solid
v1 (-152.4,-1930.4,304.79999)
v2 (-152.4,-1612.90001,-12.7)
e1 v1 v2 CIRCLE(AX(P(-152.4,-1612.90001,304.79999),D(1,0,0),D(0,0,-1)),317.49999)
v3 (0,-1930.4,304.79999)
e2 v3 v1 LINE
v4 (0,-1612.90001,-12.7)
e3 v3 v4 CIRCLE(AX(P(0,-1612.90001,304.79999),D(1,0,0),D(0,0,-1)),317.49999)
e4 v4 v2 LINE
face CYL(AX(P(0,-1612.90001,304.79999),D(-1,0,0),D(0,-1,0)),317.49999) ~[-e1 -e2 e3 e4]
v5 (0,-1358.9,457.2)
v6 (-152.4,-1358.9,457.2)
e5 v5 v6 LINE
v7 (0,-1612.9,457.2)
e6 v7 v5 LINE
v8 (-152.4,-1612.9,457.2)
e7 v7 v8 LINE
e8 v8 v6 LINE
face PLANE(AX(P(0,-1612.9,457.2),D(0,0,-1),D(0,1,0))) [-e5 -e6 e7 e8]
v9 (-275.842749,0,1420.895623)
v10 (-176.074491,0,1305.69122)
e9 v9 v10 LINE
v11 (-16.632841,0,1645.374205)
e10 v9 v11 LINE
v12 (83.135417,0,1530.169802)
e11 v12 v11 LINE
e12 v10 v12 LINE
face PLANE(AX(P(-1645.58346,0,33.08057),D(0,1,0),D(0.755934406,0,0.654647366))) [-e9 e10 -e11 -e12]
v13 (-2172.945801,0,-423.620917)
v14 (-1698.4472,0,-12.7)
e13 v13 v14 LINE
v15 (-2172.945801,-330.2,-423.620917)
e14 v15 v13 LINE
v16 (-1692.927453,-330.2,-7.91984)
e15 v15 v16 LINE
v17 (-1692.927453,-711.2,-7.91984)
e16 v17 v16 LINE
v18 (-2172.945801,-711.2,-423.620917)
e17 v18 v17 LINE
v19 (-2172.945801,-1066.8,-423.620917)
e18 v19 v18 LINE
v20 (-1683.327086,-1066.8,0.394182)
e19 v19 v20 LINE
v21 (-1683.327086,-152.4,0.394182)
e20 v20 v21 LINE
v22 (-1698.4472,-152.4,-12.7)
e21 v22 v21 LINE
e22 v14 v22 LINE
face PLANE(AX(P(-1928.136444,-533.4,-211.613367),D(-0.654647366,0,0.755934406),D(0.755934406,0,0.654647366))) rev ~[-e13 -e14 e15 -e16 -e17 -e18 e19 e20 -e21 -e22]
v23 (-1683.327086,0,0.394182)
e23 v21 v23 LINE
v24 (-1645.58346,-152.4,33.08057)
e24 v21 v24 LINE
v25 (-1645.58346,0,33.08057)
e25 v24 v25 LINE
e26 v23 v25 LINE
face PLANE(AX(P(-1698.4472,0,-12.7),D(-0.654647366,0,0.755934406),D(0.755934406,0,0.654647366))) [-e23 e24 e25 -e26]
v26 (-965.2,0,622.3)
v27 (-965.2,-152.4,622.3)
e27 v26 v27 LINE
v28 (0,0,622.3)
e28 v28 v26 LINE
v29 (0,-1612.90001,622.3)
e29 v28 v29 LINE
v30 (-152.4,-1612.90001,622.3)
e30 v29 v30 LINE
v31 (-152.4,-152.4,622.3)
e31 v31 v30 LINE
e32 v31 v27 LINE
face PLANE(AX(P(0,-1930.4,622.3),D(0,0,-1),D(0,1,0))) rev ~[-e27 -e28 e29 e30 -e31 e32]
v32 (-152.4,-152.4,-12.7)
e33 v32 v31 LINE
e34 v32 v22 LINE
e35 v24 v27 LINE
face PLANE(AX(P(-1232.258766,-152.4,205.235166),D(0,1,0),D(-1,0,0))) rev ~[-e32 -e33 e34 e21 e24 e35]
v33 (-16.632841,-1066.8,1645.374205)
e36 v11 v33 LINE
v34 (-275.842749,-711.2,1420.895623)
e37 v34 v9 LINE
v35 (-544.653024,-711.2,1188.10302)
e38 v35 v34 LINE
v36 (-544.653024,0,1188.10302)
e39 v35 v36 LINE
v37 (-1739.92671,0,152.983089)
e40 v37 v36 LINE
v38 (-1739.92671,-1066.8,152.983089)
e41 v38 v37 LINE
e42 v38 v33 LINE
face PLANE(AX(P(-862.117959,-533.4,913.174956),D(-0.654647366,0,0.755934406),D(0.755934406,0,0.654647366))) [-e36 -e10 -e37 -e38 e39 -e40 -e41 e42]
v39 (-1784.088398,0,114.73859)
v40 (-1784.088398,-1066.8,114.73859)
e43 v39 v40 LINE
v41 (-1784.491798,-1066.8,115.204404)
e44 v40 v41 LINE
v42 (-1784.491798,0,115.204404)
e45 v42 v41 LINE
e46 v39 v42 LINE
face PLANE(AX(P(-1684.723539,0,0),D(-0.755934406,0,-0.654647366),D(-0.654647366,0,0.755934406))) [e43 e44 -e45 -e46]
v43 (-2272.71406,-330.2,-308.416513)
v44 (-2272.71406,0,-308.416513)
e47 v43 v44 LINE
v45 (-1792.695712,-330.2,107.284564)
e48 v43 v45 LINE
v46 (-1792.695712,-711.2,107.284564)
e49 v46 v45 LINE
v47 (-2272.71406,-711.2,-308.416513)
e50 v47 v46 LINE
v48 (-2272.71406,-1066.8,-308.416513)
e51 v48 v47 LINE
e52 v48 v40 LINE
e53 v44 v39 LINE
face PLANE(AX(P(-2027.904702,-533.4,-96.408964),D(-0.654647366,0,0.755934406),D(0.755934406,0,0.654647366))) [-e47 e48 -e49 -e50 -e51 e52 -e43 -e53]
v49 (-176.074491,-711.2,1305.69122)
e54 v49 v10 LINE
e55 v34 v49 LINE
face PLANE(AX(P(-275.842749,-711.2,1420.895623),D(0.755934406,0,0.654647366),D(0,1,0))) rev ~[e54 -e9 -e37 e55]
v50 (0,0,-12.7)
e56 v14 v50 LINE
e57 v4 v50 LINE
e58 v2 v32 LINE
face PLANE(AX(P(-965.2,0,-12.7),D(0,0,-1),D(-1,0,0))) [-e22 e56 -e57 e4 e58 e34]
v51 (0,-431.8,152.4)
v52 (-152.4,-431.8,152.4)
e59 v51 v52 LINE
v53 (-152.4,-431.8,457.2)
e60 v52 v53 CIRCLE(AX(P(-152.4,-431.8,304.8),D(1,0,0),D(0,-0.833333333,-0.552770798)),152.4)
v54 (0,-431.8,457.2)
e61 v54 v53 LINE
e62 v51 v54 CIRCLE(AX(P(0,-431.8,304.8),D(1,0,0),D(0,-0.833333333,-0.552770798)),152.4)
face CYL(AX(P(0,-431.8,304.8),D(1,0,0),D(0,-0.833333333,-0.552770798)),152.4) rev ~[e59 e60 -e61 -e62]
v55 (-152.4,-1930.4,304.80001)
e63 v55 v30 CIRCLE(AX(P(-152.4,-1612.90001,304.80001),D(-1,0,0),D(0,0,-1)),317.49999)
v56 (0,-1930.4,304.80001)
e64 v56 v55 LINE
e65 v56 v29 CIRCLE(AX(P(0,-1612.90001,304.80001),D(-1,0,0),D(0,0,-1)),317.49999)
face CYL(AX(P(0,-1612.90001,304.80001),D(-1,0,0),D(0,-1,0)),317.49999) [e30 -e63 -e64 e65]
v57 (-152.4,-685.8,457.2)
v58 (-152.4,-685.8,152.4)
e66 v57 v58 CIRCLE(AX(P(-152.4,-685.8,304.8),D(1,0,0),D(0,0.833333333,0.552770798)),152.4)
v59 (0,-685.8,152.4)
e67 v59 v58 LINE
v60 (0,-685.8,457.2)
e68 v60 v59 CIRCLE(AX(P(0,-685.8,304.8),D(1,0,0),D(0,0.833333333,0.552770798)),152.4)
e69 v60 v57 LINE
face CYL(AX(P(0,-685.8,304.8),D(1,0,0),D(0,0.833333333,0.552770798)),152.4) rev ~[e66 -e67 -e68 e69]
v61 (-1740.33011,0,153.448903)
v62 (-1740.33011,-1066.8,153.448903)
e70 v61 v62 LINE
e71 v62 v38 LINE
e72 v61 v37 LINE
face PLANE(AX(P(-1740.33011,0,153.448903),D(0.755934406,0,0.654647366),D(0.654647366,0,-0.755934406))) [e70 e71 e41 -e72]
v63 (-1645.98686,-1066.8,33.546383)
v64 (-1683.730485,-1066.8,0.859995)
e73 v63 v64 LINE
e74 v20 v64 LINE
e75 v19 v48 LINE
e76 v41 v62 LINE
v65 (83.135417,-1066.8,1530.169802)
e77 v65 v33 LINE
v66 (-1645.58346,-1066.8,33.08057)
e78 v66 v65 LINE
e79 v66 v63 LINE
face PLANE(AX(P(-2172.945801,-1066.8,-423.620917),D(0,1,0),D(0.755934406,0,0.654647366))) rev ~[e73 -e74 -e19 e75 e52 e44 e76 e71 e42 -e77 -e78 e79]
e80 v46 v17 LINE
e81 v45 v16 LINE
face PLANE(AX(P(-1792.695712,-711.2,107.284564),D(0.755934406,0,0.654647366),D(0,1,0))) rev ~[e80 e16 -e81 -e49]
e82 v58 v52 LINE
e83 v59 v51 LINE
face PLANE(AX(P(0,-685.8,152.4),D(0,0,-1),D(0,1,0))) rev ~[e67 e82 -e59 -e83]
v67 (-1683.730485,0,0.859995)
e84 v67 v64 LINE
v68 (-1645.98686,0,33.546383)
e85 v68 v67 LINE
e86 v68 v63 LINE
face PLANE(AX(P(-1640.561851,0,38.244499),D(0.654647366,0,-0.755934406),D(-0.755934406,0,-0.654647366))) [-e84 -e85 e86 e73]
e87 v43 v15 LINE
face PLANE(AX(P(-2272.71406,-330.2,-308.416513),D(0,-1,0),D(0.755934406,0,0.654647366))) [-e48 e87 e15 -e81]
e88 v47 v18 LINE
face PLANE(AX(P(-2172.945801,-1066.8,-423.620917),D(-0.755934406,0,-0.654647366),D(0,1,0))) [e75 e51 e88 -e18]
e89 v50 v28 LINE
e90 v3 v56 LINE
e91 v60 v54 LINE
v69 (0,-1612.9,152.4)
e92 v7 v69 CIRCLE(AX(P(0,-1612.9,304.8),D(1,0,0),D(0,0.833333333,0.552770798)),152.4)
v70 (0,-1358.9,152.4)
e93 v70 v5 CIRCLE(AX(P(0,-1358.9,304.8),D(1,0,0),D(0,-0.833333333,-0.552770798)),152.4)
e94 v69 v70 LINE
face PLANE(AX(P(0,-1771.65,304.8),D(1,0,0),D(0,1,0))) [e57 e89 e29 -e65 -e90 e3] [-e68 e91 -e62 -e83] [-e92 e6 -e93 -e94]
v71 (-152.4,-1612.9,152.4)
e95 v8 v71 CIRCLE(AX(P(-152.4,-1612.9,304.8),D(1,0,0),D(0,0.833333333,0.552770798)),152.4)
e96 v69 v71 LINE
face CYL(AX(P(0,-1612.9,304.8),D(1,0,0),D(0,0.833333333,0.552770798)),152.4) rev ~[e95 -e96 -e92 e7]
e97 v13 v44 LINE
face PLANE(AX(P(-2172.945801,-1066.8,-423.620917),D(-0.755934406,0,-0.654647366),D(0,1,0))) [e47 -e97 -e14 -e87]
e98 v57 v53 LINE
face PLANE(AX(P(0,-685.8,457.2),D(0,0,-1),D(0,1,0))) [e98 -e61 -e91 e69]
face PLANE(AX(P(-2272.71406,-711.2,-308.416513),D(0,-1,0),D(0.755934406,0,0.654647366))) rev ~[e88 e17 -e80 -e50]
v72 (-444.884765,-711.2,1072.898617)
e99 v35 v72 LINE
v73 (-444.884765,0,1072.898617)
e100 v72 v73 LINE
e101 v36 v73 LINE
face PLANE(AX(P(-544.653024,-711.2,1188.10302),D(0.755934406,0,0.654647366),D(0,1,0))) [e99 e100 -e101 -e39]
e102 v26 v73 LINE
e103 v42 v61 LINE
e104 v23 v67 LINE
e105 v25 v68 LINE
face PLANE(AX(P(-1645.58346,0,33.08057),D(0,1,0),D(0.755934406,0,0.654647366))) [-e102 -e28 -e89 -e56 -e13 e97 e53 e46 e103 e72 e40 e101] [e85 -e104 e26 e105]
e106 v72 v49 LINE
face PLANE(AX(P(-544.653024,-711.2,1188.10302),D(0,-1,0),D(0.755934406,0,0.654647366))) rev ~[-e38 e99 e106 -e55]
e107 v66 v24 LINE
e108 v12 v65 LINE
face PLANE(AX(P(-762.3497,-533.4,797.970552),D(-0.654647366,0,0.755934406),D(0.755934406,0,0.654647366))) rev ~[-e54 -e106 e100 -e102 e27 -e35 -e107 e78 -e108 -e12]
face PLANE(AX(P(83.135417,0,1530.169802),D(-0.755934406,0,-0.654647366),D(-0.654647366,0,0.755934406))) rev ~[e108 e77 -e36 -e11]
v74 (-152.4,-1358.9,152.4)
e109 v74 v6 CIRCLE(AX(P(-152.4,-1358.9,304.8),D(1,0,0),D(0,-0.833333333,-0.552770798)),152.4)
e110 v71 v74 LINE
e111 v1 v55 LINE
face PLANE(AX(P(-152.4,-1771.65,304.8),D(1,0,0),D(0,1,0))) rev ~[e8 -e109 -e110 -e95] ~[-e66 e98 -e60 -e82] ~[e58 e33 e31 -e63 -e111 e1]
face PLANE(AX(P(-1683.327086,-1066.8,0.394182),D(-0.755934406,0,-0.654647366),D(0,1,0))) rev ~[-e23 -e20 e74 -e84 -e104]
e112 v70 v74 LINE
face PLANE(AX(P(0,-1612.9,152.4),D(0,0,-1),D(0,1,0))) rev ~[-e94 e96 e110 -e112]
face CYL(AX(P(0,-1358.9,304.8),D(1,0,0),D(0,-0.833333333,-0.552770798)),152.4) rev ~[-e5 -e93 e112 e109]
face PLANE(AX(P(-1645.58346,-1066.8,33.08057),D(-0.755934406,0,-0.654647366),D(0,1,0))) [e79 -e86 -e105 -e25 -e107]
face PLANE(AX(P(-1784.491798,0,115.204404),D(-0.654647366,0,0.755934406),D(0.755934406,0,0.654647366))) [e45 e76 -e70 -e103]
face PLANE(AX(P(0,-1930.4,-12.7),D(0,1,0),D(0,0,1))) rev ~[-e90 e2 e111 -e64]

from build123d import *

# Parameters (mm, degrees)
F0_W      = 1612.9
F0_H      = 12.7
F0_H_2    = 609.6
F1_DEPTH  = 152.4
F2_W      = 254
F2_H      = 304.8
F3_DEPTH  = 152.4
F4_W      = 317.5
F4_H      = 635
F5_DEPTH  = 152.4
F6_R      = 317.49999
F8_DEPTH  = 152.4
F9_W      = 965.2
F9_H      = 635
F10_DEPTH = 152.4
F12_DEPTH = 152.4
F14_W     = 647.7
F14_H     = 1066.8
F15_DEPTH = 152.4
F16_W     = 2336.8
F16_H     = 1066.8
F17_DEPTH = 152.4
F19_DEPTH = 1066.8
F22_DEPTH = 1066.8
F23_W     = 635
F23_H     = 381
F24_DEPTH = 152.4
F25_W     = 355.6
F25_H     = 711.2
F26_DEPTH = 152.4


# Not quite as in the source:
# - a fillet or chamfer is up to 0.001 mm smaller than in the source, because OpenCascade refuses the exact size
# - a feature names something its author has since deleted; it is built from what else it names


with BuildPart() as f1:
    # F0 (on Right) → F1 (new body)
    with BuildSketch(Plane.YZ):
        with Locations((-806.45, -6.35)):
            Rectangle(F0_W, F0_H)
        with Locations((-806.45, 304.8)):
            Rectangle(F0_W, F0_H_2)
        with Locations((-806.45, 615.95)):
            Rectangle(F0_W, F0_H)
    extrude(amount=-F1_DEPTH)

    # F2 (on face) → F3 (cut)
    with BuildSketch(Plane.YZ):
        with Locations((-558.8, 304.8)):
            Rectangle(F2_W, F2_H)
        with Locations((-1485.9, 304.8)):
            Rectangle(F2_W, F2_H)
    extrude(amount=-F3_DEPTH, mode=Mode.SUBTRACT)

    # F4 (on face) → F5 (join)
    with BuildSketch(Plane.YZ):
        with Locations((-1771.65, 304.8)):
            Rectangle(F4_W, F4_H)
    extrude(amount=-F5_DEPTH)

    # F6 (radius 317.5 in the source; OpenCascade refuses exactly that, so slightly less here)
    f6_edges = [f1.edges().sort_by_distance(p)[0] for p in [
        (-76.2, -1930.4, 622.3),
        (-76.2, -1930.4, -12.7),
    ]]
    fillet(f6_edges, radius=F6_R)

    # F7 (on face) → F8 (cut)
    with BuildSketch(Plane.YZ):
        with BuildLine():
            ThreePointArc((-1485.9, 220.557730325), (-1466.9881087779, 260.8059094878), (-1460.5, 304.8))
            ThreePointArc((-1460.5, 304.8), (-1466.9881087779, 348.7940905122), (-1485.9, 389.042269675))
            ThreePointArc((-1485.9, 389.042269675), (-1511.3, 304.8), (-1485.9, 220.557730325))
        make_face()
        with BuildLine():
            ThreePointArc((-1485.9, 389.042269675), (-1466.9881087779, 348.7940905122), (-1460.5, 304.8))
            ThreePointArc((-1460.5, 304.8), (-1466.9881087779, 260.8059094878), (-1485.9, 220.557730325))
            ThreePointArc((-1485.9, 220.557730325), (-1314.9059094878, 158.8881087779), (-1206.5, 304.8))
            ThreePointArc((-1206.5, 304.8), (-1314.9059094878, 450.7118912221), (-1485.9, 389.042269675))
        make_face()
        with BuildLine():
            ThreePointArc((-1485.9, 220.557730325), (-1511.3, 304.8), (-1485.9, 389.042269675))
            ThreePointArc((-1485.9, 389.042269675), (-1765.3, 304.8), (-1485.9, 220.557730325))
        make_face()
        with BuildLine():
            ThreePointArc((-558.8, 220.557730325), (-539.8881087779, 260.8059094878), (-533.4, 304.8))
            ThreePointArc((-533.4, 304.8), (-539.8881087779, 348.7940905122), (-558.8, 389.042269675))
            ThreePointArc((-558.8, 389.042269675), (-584.2, 304.8), (-558.8, 220.557730325))
        make_face()
        with BuildLine():
            ThreePointArc((-558.8, 389.042269675), (-539.8881087779, 348.7940905122), (-533.4, 304.8))
            ThreePointArc((-533.4, 304.8), (-539.8881087779, 260.8059094878), (-558.8, 220.557730325))
            ThreePointArc((-558.8, 220.557730325), (-387.8059094878, 158.8881087779), (-279.4, 304.8))
            ThreePointArc((-279.4, 304.8), (-387.8059094878, 450.7118912221), (-558.8, 389.042269675))
        make_face()
        with BuildLine():
            ThreePointArc((-558.8, 220.557730325), (-584.2, 304.8), (-558.8, 389.042269675))
            ThreePointArc((-558.8, 389.042269675), (-838.2, 304.8), (-558.8, 220.557730325))
        make_face()
    extrude(amount=-F8_DEPTH, mode=Mode.SUBTRACT)

    # F9 (on face) → F10 (join)
    with BuildSketch(Plane(origin=(0, 0, 0), x_dir=(-1, 0, 0), z_dir=(0, 1, 0))):
        with Locations((482.6, 304.8)):
            Rectangle(F9_W, F9_H)
    extrude(amount=-F10_DEPTH)

    # F11 (on face) → F12 (join)
    with BuildSketch(Plane(origin=(0, 0, 0), x_dir=(-1, 0, 0), z_dir=(0, 1, 0))):
        Polygon((1698.4472, -12.7), (965.2, 622.3), (965.2, -12.7), align=None)
    extrude(amount=-F12_DEPTH)

    # F14 (on offset) → F15 (join)
    with BuildSketch(Plane(origin=(-721.6070671381, 0, 833.2541125657), x_dir=(0.7559344062, 0, 0.6546473658), z_dir=(-0.6546473658, 0, 0.7559344062))):
        with Locations((-1596.0768110359, -533.4)):
            Rectangle(F14_W, F14_H)
    extrude(amount=F15_DEPTH)

    # F16 (on offset) → F17 (join)
    with BuildSketch(Plane(origin=(-721.6070671381, 0, 833.2541125657), x_dir=(0.7559344062, 0, 0.6546473658), z_dir=(-0.6546473658, 0, 0.7559344062))):
        with Locations((-53.897047908, -533.4)):
            Rectangle(F16_W, F16_H)
    extrude(amount=F17_DEPTH)

    # F18 (on face) → F19 (cut)
    with BuildSketch(Plane(origin=(0, 0, 0), x_dir=(-1, 0, 0), z_dir=(0, 1, 0))):
        Polygon((16.6328412597, 1645.374205089), (-21.1158016224, 1678.0649378052), (-120.8840601663, 1562.8605342995), (-83.1354172842, 1530.1698015833), align=None)
    extrude(amount=-F19_DEPTH, mode=Mode.SUBTRACT)

    # F21 (on offset) → F22 (join)
    with BuildSketch(Plane(origin=(0, 0, 0), x_dir=(-1, 0, 0), z_dir=(0, 1, 0))):
        Polygon((1640.5618513332, 38.2444991085), (1684.7235393438, 0), (1784.4917978876, 115.2044035058), (1740.3301098771, 153.4489026143), align=None)
    extrude(amount=-F22_DEPTH)

    # F23 (on face) → F24 (cut)
    with BuildSketch(Plane(origin=(-821.375325682, 0, 948.4585160715), x_dir=(0.7559344062, 0, 0.6546473658), z_dir=(-0.6546473658, 0, 0.7559344062))):
        with Locations((-1602.4268110359, -520.7)):
            Rectangle(F23_W, F23_H)
    extrude(amount=-F24_DEPTH, mode=Mode.SUBTRACT)

    # F25 (on face) → F26 (cut)
    with BuildSketch(Plane(origin=(-821.375325682, 0, 948.4585160715), x_dir=(0.7559344062, 0, 0.6546473658), z_dir=(-0.6546473658, 0, 0.7559344062))):
        with Locations((543.866552092, -355.6)):
            Rectangle(F25_W, F25_H)
    extrude(amount=-F26_DEPTH, mode=Mode.SUBTRACT)


solid = f1.part
